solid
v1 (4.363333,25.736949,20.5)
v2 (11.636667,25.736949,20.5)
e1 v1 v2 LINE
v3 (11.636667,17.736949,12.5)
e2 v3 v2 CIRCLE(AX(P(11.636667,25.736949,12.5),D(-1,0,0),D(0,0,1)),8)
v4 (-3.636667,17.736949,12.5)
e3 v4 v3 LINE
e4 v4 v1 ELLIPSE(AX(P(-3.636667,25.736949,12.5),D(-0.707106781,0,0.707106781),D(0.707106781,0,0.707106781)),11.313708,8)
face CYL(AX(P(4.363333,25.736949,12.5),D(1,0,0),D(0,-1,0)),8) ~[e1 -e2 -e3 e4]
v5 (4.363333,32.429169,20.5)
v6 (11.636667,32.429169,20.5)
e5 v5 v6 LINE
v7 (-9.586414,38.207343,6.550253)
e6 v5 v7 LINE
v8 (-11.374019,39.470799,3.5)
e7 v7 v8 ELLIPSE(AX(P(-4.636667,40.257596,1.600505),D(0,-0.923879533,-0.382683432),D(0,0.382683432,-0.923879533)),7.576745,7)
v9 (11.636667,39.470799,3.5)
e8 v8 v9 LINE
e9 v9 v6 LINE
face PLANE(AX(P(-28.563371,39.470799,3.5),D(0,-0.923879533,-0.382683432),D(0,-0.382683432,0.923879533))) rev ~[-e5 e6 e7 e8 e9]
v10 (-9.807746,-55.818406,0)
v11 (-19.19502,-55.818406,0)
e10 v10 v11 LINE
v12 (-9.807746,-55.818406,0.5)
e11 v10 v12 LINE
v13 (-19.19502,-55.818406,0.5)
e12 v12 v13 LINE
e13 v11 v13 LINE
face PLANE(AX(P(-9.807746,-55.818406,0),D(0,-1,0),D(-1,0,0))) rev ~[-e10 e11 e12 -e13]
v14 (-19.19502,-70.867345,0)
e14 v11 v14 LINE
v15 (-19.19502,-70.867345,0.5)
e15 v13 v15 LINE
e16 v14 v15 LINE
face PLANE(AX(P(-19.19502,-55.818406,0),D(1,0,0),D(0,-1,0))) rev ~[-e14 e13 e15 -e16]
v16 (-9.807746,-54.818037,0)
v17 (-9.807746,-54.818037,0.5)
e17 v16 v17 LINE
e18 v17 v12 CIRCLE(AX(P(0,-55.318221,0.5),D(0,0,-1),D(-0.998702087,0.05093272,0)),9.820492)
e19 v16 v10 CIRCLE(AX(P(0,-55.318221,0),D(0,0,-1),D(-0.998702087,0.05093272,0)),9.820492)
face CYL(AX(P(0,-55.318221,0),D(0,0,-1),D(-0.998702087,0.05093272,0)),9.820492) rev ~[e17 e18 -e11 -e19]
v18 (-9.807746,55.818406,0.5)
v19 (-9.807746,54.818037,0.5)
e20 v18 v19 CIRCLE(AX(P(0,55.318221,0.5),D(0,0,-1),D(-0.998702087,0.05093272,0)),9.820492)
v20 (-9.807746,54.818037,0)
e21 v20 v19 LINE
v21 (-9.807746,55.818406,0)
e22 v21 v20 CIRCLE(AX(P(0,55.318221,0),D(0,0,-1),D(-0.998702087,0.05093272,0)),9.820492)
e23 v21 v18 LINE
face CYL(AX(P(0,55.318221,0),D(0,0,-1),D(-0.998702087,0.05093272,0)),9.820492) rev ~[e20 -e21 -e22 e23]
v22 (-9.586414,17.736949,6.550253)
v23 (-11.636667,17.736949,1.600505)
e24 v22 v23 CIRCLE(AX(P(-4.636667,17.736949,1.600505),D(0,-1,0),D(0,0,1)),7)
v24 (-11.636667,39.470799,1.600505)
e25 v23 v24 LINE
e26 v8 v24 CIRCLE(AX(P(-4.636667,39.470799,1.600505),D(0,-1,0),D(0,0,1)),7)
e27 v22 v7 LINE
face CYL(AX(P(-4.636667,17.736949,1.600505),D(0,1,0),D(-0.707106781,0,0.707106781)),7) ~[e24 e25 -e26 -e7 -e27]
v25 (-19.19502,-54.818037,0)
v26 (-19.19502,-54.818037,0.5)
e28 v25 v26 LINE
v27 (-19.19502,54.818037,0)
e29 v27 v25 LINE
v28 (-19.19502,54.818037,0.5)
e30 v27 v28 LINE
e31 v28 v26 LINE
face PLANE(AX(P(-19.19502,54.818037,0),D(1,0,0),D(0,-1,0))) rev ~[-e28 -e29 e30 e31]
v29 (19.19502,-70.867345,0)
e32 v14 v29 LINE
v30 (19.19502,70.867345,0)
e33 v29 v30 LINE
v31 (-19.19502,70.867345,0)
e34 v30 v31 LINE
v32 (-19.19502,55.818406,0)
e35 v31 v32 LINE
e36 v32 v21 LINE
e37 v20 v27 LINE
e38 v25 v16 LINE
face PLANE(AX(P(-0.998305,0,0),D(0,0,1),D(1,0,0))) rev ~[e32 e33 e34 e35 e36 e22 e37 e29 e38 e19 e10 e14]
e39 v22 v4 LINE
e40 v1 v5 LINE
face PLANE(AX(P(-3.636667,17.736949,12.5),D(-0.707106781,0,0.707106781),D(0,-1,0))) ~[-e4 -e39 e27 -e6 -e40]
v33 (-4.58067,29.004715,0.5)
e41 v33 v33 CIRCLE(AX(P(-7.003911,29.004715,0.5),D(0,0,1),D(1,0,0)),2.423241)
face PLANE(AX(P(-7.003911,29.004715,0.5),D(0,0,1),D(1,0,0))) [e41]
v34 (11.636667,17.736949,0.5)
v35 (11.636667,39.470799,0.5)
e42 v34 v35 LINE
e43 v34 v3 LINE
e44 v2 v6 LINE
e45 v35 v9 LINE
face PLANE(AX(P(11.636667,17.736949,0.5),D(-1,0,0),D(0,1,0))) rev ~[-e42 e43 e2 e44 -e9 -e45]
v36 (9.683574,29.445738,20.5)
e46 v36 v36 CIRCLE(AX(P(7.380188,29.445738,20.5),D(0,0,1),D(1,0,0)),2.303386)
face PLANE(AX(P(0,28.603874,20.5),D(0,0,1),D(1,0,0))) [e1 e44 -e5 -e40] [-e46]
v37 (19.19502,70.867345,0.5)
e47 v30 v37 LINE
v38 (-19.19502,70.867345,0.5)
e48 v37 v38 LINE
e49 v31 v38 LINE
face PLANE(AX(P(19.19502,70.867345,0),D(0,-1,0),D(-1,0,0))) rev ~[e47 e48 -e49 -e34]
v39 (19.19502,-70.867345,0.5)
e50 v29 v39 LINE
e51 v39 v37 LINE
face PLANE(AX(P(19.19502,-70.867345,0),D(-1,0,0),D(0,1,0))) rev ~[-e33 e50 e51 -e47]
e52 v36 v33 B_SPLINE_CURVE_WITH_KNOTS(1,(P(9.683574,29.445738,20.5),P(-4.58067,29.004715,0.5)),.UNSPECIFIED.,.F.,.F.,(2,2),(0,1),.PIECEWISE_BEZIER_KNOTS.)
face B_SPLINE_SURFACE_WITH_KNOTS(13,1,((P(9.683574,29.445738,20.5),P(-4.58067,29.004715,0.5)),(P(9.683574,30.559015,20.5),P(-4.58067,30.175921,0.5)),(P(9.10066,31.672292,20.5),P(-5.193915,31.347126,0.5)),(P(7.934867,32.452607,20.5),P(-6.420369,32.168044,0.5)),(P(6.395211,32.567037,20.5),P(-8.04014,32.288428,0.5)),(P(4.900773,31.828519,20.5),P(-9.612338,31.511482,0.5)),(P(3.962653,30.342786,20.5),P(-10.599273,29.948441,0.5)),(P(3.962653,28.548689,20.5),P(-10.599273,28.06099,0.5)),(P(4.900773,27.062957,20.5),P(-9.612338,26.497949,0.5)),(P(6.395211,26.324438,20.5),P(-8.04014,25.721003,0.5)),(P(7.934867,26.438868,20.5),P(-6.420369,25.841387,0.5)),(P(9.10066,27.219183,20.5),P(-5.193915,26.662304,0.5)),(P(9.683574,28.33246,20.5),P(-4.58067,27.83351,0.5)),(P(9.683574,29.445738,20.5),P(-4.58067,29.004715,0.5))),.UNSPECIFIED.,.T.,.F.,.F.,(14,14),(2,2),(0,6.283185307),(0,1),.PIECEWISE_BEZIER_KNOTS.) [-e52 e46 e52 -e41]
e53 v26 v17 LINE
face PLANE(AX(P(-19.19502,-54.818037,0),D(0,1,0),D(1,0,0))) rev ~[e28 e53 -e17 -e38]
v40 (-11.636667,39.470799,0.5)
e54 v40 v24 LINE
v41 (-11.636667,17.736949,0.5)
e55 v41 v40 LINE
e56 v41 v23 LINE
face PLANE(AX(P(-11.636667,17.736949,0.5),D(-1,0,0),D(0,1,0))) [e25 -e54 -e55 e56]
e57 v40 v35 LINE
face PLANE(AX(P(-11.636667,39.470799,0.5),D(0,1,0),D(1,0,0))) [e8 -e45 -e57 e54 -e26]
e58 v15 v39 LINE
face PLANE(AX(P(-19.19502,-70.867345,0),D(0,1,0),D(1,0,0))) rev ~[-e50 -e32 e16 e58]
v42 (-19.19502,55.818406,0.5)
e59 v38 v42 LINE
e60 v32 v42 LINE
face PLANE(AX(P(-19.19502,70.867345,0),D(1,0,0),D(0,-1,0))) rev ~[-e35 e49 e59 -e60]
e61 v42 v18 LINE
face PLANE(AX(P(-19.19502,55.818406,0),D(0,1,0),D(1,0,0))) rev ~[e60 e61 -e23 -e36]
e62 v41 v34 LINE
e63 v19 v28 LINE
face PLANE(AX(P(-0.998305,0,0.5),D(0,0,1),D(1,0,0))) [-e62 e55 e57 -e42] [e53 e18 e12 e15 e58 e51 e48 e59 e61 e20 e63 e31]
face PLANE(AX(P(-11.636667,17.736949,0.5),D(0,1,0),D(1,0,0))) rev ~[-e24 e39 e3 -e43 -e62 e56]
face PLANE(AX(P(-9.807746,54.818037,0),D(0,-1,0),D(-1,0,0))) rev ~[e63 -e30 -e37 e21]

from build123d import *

# Parameters (mm, degrees)
F1_DEPTH     = 0.5
F2_W         = 23.2733339071
F2_H         = 21.7338502407
F3_DEPTH     = 20
F6_R         = 2.3033864012
F5_R         = 2.4232405009
F8_SIZE      = 16
F9_R         = 8
F10_R        = 7
F11_SIZE     = 7
F12_T1_DEPTH = 66.1267417653


# Not quite as in the source:
# - a fillet or chamfer that OpenCascade refuses, or shapes differently, is made with other operations: its cross-section is extruded or revolved along the edge and cut away or added


with BuildPart() as f1:
    # F0 (on Top) → F1 (new body)
    with BuildSketch(Plane.XY):
        with BuildLine():
            Line((19.1950201988, 70.8673447371), (-19.1950201988, 70.8673447371))
            Line((-19.1950201988, 70.8673447371), (-19.1950201988, 55.8184058152))
            Line((-19.1950201988, 55.8184058152), (-9.8077457496, 55.8184058152))
            ThreePointArc((-9.8077457496, 55.8184058152), (9.8204918965, 55.3182214499), (-9.8077457496, 54.8180370845))
            Line((-9.8077457496, 54.8180370845), (-19.1950201988, 54.8180370845))
            Line((-19.1950201988, 54.8180370845), (-19.1950201988, -54.8180370845))
            Line((-19.1950201988, -54.8180370845), (-9.8077457496, -54.8180370845))
            ThreePointArc((-9.8077457496, -54.8180370845), (9.8204918965, -55.3182214499), (-9.8077457496, -55.8184058152))
            Line((-9.8077457496, -55.8184058152), (-19.1950201988, -55.8184058152))
            Line((-19.1950201988, -55.8184058152), (-19.1950201988, -70.8673447371))
            Line((-19.1950201988, -70.8673447371), (19.1950201988, -70.8673447371))
            Line((19.1950201988, -70.8673447371), (19.1950201988, 70.8673447371))
        make_face()
    extrude(amount=F1_DEPTH)

    # F2 (on face) → F3 (join)
    with BuildSketch(Plane.XY.offset(0.5)):
        with Locations((0, 28.6038741469)):
            Rectangle(F2_W, F2_H)
    extrude(amount=F3_DEPTH)

    # F6 (on face) → F7 section 0
    with BuildSketch(Plane.XY.offset(20.5)):
        with Locations((7.3801875114, 29.4457376003)):
            Circle(F6_R)
    # F5 (on offset) → F7 section 1
    with BuildSketch(Plane.XY.offset(0.5)):
        with Locations((-7.0039108396, 29.0047153831)):
            Circle(F5_R)
    loft(mode=Mode.SUBTRACT)

    # F8
    f8_edges = [f1.edges().sort_by_distance(p)[0] for p in [
        (-11.636667, 28.603874, 20.5),
    ]]
    chamfer(f8_edges, length=F8_SIZE)

    # F9
    f9_edges = [f1.edges().sort_by_distance(p)[0] for p in [
        (8, 17.736949, 20.5),
    ]]
    fillet(f9_edges, radius=F9_R)

    # F10
    f10_edges = [f1.edges().sort_by_distance(p)[0] for p in [
        (-11.636667, 28.603874, 4.5),
    ]]
    fillet(f10_edges, radius=F10_R)

    # F11
    f11_edges = [f1.edges().sort_by_distance(p)[0] for p in [
        (8, 39.470799, 20.5),
    ]]
    chamfer(f11_edges, length=F11_SIZE)

    # F12: chamfer of 10 on 1 edges, made by hand

    # F12_s2 → F12_t1 (cut)
    with BuildSketch(Plane.YZ.offset(-28.5633708826)):
        Polygon((39.4707992673, 3.5), (32.3997314554, 20.5710678119), (39.4707992673, 13.5), align=None)
    extrude(amount=F12_T1_DEPTH, mode=Mode.SUBTRACT)


solid = f1.part
